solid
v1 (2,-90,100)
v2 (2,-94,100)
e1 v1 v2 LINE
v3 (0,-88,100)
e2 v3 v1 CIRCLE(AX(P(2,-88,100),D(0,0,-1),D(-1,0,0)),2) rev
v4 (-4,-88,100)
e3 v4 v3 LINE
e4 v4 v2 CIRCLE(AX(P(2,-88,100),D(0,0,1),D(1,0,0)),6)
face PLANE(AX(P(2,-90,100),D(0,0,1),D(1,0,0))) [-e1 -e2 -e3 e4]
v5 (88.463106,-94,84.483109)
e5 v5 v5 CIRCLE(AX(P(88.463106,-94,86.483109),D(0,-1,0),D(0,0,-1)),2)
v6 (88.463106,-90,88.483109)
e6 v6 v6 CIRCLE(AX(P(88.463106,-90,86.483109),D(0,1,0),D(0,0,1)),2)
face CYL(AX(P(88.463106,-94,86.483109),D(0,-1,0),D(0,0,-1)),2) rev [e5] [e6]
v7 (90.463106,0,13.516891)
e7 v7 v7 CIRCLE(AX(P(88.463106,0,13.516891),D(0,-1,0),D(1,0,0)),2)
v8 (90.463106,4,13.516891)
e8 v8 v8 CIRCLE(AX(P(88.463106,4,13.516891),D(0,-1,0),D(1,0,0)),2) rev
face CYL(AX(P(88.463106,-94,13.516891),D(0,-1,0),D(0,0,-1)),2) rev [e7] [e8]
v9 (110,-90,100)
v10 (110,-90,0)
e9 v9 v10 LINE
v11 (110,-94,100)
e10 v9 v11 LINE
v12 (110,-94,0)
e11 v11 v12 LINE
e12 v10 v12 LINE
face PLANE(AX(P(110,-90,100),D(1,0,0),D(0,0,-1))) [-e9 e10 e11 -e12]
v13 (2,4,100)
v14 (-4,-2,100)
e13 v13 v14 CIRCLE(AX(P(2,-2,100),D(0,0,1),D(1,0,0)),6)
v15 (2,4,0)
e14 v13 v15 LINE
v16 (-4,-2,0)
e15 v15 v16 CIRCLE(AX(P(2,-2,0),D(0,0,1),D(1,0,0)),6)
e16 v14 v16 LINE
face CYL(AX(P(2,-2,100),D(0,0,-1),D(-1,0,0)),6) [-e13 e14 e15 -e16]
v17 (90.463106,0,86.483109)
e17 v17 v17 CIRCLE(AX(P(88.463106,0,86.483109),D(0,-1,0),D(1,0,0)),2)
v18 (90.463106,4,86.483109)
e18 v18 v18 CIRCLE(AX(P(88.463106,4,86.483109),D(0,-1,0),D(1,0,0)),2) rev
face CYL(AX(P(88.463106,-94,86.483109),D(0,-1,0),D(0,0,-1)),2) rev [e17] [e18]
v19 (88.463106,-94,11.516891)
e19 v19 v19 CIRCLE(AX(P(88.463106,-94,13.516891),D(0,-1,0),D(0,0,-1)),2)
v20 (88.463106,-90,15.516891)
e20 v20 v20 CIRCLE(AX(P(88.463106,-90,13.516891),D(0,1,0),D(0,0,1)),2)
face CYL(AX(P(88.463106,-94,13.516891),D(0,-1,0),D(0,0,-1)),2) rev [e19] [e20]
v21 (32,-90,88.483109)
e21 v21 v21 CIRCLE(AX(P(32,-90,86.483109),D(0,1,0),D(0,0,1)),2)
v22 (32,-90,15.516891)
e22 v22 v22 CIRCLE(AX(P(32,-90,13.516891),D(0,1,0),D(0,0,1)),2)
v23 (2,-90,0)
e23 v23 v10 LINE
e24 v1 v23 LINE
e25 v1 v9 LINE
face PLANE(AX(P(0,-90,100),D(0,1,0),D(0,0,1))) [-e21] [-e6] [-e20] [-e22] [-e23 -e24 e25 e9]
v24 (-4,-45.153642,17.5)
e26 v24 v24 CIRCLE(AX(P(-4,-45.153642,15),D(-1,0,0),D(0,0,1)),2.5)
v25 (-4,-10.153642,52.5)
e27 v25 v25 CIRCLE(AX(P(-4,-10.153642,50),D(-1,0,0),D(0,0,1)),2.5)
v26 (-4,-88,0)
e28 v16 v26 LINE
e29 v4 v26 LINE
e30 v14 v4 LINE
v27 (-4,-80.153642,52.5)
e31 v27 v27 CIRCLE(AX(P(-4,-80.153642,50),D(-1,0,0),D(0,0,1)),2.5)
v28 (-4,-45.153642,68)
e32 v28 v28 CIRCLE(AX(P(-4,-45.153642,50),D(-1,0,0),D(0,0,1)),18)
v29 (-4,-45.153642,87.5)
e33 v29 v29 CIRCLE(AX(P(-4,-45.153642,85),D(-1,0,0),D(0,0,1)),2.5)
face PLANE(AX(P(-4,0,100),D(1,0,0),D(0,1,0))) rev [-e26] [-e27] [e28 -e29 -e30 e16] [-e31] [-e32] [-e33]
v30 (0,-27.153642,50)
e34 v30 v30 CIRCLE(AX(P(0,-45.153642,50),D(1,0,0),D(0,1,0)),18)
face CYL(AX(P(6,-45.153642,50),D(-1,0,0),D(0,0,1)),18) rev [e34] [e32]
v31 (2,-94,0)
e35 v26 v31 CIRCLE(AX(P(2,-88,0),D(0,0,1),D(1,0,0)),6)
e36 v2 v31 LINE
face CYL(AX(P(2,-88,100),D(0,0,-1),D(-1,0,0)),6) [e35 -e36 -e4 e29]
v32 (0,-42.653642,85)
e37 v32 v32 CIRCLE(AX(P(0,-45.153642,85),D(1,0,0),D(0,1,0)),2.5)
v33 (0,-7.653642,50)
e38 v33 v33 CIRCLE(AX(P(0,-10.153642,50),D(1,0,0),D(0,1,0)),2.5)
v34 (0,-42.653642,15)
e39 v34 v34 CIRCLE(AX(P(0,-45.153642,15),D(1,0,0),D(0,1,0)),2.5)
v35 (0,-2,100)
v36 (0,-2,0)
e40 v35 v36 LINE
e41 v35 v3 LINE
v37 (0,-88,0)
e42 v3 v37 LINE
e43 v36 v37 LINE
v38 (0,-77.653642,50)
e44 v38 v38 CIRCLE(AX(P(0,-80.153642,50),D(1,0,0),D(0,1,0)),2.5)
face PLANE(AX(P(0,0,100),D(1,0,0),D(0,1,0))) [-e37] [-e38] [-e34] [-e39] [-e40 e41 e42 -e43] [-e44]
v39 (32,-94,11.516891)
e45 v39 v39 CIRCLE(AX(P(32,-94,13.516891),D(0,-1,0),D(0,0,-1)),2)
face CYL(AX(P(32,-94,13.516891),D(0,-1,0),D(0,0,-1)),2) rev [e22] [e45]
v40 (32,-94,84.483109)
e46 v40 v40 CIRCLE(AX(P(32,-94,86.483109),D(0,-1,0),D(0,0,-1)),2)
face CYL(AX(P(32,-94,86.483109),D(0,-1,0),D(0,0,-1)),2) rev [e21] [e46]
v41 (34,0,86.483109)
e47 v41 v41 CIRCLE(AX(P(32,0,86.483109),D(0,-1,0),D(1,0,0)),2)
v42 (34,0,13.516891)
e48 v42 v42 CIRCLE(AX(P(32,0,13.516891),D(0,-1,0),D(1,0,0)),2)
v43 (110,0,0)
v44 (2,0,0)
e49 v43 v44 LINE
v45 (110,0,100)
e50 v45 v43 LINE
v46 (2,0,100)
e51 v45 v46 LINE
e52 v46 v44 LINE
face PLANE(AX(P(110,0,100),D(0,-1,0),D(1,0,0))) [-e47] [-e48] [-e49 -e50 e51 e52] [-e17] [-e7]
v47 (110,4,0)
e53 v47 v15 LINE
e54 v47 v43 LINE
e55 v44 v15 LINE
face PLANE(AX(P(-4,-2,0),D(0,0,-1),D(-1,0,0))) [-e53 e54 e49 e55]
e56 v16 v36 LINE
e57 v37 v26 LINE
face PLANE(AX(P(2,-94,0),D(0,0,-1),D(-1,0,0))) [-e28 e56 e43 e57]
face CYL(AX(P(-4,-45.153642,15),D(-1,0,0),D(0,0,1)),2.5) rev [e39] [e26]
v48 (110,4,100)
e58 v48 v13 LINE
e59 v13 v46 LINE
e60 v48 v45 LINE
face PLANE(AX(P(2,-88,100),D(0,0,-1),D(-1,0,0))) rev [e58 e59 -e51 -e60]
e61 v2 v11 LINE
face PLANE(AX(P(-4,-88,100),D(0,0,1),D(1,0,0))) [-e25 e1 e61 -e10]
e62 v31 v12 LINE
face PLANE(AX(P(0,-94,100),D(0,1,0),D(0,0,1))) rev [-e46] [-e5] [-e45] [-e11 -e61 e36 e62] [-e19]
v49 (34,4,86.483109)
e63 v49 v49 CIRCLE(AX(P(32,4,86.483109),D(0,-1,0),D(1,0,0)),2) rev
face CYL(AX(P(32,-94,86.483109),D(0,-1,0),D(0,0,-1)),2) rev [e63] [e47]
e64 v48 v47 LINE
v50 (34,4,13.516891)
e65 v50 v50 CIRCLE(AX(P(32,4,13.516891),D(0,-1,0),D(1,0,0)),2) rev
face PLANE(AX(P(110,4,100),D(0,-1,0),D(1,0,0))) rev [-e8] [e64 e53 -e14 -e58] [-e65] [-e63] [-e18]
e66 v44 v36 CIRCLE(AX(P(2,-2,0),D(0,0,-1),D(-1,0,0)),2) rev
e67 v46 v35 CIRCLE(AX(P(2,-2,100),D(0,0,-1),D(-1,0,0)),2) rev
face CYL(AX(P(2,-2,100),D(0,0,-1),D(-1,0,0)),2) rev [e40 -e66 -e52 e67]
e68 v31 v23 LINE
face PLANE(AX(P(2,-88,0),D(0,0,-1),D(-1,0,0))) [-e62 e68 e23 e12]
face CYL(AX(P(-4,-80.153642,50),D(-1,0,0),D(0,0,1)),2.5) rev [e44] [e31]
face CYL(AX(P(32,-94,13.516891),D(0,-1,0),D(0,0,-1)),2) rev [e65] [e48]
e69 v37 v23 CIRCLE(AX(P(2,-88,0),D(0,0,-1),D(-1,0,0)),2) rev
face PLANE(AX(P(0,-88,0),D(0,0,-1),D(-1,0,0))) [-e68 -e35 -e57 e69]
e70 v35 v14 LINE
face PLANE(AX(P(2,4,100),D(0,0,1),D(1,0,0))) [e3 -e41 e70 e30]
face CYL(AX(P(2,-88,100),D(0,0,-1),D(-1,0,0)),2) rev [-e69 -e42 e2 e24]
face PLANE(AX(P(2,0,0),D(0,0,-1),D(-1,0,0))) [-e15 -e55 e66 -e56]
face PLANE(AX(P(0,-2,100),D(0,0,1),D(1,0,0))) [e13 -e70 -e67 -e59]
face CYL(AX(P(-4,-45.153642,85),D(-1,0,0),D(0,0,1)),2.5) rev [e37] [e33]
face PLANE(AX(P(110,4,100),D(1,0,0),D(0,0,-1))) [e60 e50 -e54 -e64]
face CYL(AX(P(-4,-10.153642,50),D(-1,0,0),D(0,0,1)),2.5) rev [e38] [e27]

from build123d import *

# Parameters (mm, degrees)
BASE_FLANGE3_DEPTH        = 100
SKETCH16_R                = 18
CUT_EXTRUDE1_DEPTH        = 10
F_4_0MM_DOWEL_HOLE1_D     = 4
F_5_0MM_DOWEL_HOLE1_D     = 5
F_5_0MM_DOWEL_HOLE1_DEPTH = 98.31
F_5_0MM_DOWEL_HOLE1_TIP   = 1.502151548


# Sheet-metal steps are written as plain solids
with BuildPart() as part:
    # Sketch1 → Base-Flange3 (new body)
    with BuildSketch(Plane.XY):
        with BuildLine():
            Line((110, 0), (2, 0))
            ThreePointArc((2, 0), (0.585786438, -0.585786438), (0, -2))
            Line((0, -2), (0, -88))
            ThreePointArc((0, -88), (0.585786438, -89.414213562), (2, -90))
            Line((2, -90), (110, -90))
            Line((110, -90), (110, -94))
            Line((110, -94), (2, -94))
            ThreePointArc((2, -94), (-2.242640687, -92.242640687), (-4, -88))
            Line((-4, -88), (-4, -2))
            ThreePointArc((-4, -2), (-2.242640687, 2.242640687), (2, 4))
            Line((2, 4), (110, 4))
            Line((110, 4), (110, 0))
        make_face()
    extrude(amount=BASE_FLANGE3_DEPTH)

    # Sketch16 → Cut-Extrude1 (cut)
    with BuildSketch(Plane.ZY.offset(4)):
        with Locations((50, -45.153641777)):
            Circle(SKETCH16_R)
    extrude(amount=-CUT_EXTRUDE1_DEPTH, mode=Mode.SUBTRACT)

    # Ø4.0mm Dowel Hole1 (through all)
    with Locations(Plane(origin=(0, -94, 0), x_dir=(-1, 0, 0), z_dir=(0, -1, 0))):
        with Locations((-32, -86.483109463), (-32, -13.516890537), (-88.463106056, -86.483109463), (-88.463106056, -13.516890537)):
            Hole(F_4_0MM_DOWEL_HOLE1_D / 2)

    # Ø5.0mm Dowel Hole1
    with Locations(Plane.ZY.offset(4)):
        with Locations((50, -10.153641777), (85, -45.153641777), (50, -80.153641777), (15, -45.153641777)):
            Hole(F_5_0MM_DOWEL_HOLE1_D / 2, depth=F_5_0MM_DOWEL_HOLE1_DEPTH)
            with Locations((0, 0, -(F_5_0MM_DOWEL_HOLE1_DEPTH + F_5_0MM_DOWEL_HOLE1_TIP / 2))):  # 118° drill point
                Cone(0, F_5_0MM_DOWEL_HOLE1_D / 2, F_5_0MM_DOWEL_HOLE1_TIP, mode=Mode.SUBTRACT)


solid = part.part
